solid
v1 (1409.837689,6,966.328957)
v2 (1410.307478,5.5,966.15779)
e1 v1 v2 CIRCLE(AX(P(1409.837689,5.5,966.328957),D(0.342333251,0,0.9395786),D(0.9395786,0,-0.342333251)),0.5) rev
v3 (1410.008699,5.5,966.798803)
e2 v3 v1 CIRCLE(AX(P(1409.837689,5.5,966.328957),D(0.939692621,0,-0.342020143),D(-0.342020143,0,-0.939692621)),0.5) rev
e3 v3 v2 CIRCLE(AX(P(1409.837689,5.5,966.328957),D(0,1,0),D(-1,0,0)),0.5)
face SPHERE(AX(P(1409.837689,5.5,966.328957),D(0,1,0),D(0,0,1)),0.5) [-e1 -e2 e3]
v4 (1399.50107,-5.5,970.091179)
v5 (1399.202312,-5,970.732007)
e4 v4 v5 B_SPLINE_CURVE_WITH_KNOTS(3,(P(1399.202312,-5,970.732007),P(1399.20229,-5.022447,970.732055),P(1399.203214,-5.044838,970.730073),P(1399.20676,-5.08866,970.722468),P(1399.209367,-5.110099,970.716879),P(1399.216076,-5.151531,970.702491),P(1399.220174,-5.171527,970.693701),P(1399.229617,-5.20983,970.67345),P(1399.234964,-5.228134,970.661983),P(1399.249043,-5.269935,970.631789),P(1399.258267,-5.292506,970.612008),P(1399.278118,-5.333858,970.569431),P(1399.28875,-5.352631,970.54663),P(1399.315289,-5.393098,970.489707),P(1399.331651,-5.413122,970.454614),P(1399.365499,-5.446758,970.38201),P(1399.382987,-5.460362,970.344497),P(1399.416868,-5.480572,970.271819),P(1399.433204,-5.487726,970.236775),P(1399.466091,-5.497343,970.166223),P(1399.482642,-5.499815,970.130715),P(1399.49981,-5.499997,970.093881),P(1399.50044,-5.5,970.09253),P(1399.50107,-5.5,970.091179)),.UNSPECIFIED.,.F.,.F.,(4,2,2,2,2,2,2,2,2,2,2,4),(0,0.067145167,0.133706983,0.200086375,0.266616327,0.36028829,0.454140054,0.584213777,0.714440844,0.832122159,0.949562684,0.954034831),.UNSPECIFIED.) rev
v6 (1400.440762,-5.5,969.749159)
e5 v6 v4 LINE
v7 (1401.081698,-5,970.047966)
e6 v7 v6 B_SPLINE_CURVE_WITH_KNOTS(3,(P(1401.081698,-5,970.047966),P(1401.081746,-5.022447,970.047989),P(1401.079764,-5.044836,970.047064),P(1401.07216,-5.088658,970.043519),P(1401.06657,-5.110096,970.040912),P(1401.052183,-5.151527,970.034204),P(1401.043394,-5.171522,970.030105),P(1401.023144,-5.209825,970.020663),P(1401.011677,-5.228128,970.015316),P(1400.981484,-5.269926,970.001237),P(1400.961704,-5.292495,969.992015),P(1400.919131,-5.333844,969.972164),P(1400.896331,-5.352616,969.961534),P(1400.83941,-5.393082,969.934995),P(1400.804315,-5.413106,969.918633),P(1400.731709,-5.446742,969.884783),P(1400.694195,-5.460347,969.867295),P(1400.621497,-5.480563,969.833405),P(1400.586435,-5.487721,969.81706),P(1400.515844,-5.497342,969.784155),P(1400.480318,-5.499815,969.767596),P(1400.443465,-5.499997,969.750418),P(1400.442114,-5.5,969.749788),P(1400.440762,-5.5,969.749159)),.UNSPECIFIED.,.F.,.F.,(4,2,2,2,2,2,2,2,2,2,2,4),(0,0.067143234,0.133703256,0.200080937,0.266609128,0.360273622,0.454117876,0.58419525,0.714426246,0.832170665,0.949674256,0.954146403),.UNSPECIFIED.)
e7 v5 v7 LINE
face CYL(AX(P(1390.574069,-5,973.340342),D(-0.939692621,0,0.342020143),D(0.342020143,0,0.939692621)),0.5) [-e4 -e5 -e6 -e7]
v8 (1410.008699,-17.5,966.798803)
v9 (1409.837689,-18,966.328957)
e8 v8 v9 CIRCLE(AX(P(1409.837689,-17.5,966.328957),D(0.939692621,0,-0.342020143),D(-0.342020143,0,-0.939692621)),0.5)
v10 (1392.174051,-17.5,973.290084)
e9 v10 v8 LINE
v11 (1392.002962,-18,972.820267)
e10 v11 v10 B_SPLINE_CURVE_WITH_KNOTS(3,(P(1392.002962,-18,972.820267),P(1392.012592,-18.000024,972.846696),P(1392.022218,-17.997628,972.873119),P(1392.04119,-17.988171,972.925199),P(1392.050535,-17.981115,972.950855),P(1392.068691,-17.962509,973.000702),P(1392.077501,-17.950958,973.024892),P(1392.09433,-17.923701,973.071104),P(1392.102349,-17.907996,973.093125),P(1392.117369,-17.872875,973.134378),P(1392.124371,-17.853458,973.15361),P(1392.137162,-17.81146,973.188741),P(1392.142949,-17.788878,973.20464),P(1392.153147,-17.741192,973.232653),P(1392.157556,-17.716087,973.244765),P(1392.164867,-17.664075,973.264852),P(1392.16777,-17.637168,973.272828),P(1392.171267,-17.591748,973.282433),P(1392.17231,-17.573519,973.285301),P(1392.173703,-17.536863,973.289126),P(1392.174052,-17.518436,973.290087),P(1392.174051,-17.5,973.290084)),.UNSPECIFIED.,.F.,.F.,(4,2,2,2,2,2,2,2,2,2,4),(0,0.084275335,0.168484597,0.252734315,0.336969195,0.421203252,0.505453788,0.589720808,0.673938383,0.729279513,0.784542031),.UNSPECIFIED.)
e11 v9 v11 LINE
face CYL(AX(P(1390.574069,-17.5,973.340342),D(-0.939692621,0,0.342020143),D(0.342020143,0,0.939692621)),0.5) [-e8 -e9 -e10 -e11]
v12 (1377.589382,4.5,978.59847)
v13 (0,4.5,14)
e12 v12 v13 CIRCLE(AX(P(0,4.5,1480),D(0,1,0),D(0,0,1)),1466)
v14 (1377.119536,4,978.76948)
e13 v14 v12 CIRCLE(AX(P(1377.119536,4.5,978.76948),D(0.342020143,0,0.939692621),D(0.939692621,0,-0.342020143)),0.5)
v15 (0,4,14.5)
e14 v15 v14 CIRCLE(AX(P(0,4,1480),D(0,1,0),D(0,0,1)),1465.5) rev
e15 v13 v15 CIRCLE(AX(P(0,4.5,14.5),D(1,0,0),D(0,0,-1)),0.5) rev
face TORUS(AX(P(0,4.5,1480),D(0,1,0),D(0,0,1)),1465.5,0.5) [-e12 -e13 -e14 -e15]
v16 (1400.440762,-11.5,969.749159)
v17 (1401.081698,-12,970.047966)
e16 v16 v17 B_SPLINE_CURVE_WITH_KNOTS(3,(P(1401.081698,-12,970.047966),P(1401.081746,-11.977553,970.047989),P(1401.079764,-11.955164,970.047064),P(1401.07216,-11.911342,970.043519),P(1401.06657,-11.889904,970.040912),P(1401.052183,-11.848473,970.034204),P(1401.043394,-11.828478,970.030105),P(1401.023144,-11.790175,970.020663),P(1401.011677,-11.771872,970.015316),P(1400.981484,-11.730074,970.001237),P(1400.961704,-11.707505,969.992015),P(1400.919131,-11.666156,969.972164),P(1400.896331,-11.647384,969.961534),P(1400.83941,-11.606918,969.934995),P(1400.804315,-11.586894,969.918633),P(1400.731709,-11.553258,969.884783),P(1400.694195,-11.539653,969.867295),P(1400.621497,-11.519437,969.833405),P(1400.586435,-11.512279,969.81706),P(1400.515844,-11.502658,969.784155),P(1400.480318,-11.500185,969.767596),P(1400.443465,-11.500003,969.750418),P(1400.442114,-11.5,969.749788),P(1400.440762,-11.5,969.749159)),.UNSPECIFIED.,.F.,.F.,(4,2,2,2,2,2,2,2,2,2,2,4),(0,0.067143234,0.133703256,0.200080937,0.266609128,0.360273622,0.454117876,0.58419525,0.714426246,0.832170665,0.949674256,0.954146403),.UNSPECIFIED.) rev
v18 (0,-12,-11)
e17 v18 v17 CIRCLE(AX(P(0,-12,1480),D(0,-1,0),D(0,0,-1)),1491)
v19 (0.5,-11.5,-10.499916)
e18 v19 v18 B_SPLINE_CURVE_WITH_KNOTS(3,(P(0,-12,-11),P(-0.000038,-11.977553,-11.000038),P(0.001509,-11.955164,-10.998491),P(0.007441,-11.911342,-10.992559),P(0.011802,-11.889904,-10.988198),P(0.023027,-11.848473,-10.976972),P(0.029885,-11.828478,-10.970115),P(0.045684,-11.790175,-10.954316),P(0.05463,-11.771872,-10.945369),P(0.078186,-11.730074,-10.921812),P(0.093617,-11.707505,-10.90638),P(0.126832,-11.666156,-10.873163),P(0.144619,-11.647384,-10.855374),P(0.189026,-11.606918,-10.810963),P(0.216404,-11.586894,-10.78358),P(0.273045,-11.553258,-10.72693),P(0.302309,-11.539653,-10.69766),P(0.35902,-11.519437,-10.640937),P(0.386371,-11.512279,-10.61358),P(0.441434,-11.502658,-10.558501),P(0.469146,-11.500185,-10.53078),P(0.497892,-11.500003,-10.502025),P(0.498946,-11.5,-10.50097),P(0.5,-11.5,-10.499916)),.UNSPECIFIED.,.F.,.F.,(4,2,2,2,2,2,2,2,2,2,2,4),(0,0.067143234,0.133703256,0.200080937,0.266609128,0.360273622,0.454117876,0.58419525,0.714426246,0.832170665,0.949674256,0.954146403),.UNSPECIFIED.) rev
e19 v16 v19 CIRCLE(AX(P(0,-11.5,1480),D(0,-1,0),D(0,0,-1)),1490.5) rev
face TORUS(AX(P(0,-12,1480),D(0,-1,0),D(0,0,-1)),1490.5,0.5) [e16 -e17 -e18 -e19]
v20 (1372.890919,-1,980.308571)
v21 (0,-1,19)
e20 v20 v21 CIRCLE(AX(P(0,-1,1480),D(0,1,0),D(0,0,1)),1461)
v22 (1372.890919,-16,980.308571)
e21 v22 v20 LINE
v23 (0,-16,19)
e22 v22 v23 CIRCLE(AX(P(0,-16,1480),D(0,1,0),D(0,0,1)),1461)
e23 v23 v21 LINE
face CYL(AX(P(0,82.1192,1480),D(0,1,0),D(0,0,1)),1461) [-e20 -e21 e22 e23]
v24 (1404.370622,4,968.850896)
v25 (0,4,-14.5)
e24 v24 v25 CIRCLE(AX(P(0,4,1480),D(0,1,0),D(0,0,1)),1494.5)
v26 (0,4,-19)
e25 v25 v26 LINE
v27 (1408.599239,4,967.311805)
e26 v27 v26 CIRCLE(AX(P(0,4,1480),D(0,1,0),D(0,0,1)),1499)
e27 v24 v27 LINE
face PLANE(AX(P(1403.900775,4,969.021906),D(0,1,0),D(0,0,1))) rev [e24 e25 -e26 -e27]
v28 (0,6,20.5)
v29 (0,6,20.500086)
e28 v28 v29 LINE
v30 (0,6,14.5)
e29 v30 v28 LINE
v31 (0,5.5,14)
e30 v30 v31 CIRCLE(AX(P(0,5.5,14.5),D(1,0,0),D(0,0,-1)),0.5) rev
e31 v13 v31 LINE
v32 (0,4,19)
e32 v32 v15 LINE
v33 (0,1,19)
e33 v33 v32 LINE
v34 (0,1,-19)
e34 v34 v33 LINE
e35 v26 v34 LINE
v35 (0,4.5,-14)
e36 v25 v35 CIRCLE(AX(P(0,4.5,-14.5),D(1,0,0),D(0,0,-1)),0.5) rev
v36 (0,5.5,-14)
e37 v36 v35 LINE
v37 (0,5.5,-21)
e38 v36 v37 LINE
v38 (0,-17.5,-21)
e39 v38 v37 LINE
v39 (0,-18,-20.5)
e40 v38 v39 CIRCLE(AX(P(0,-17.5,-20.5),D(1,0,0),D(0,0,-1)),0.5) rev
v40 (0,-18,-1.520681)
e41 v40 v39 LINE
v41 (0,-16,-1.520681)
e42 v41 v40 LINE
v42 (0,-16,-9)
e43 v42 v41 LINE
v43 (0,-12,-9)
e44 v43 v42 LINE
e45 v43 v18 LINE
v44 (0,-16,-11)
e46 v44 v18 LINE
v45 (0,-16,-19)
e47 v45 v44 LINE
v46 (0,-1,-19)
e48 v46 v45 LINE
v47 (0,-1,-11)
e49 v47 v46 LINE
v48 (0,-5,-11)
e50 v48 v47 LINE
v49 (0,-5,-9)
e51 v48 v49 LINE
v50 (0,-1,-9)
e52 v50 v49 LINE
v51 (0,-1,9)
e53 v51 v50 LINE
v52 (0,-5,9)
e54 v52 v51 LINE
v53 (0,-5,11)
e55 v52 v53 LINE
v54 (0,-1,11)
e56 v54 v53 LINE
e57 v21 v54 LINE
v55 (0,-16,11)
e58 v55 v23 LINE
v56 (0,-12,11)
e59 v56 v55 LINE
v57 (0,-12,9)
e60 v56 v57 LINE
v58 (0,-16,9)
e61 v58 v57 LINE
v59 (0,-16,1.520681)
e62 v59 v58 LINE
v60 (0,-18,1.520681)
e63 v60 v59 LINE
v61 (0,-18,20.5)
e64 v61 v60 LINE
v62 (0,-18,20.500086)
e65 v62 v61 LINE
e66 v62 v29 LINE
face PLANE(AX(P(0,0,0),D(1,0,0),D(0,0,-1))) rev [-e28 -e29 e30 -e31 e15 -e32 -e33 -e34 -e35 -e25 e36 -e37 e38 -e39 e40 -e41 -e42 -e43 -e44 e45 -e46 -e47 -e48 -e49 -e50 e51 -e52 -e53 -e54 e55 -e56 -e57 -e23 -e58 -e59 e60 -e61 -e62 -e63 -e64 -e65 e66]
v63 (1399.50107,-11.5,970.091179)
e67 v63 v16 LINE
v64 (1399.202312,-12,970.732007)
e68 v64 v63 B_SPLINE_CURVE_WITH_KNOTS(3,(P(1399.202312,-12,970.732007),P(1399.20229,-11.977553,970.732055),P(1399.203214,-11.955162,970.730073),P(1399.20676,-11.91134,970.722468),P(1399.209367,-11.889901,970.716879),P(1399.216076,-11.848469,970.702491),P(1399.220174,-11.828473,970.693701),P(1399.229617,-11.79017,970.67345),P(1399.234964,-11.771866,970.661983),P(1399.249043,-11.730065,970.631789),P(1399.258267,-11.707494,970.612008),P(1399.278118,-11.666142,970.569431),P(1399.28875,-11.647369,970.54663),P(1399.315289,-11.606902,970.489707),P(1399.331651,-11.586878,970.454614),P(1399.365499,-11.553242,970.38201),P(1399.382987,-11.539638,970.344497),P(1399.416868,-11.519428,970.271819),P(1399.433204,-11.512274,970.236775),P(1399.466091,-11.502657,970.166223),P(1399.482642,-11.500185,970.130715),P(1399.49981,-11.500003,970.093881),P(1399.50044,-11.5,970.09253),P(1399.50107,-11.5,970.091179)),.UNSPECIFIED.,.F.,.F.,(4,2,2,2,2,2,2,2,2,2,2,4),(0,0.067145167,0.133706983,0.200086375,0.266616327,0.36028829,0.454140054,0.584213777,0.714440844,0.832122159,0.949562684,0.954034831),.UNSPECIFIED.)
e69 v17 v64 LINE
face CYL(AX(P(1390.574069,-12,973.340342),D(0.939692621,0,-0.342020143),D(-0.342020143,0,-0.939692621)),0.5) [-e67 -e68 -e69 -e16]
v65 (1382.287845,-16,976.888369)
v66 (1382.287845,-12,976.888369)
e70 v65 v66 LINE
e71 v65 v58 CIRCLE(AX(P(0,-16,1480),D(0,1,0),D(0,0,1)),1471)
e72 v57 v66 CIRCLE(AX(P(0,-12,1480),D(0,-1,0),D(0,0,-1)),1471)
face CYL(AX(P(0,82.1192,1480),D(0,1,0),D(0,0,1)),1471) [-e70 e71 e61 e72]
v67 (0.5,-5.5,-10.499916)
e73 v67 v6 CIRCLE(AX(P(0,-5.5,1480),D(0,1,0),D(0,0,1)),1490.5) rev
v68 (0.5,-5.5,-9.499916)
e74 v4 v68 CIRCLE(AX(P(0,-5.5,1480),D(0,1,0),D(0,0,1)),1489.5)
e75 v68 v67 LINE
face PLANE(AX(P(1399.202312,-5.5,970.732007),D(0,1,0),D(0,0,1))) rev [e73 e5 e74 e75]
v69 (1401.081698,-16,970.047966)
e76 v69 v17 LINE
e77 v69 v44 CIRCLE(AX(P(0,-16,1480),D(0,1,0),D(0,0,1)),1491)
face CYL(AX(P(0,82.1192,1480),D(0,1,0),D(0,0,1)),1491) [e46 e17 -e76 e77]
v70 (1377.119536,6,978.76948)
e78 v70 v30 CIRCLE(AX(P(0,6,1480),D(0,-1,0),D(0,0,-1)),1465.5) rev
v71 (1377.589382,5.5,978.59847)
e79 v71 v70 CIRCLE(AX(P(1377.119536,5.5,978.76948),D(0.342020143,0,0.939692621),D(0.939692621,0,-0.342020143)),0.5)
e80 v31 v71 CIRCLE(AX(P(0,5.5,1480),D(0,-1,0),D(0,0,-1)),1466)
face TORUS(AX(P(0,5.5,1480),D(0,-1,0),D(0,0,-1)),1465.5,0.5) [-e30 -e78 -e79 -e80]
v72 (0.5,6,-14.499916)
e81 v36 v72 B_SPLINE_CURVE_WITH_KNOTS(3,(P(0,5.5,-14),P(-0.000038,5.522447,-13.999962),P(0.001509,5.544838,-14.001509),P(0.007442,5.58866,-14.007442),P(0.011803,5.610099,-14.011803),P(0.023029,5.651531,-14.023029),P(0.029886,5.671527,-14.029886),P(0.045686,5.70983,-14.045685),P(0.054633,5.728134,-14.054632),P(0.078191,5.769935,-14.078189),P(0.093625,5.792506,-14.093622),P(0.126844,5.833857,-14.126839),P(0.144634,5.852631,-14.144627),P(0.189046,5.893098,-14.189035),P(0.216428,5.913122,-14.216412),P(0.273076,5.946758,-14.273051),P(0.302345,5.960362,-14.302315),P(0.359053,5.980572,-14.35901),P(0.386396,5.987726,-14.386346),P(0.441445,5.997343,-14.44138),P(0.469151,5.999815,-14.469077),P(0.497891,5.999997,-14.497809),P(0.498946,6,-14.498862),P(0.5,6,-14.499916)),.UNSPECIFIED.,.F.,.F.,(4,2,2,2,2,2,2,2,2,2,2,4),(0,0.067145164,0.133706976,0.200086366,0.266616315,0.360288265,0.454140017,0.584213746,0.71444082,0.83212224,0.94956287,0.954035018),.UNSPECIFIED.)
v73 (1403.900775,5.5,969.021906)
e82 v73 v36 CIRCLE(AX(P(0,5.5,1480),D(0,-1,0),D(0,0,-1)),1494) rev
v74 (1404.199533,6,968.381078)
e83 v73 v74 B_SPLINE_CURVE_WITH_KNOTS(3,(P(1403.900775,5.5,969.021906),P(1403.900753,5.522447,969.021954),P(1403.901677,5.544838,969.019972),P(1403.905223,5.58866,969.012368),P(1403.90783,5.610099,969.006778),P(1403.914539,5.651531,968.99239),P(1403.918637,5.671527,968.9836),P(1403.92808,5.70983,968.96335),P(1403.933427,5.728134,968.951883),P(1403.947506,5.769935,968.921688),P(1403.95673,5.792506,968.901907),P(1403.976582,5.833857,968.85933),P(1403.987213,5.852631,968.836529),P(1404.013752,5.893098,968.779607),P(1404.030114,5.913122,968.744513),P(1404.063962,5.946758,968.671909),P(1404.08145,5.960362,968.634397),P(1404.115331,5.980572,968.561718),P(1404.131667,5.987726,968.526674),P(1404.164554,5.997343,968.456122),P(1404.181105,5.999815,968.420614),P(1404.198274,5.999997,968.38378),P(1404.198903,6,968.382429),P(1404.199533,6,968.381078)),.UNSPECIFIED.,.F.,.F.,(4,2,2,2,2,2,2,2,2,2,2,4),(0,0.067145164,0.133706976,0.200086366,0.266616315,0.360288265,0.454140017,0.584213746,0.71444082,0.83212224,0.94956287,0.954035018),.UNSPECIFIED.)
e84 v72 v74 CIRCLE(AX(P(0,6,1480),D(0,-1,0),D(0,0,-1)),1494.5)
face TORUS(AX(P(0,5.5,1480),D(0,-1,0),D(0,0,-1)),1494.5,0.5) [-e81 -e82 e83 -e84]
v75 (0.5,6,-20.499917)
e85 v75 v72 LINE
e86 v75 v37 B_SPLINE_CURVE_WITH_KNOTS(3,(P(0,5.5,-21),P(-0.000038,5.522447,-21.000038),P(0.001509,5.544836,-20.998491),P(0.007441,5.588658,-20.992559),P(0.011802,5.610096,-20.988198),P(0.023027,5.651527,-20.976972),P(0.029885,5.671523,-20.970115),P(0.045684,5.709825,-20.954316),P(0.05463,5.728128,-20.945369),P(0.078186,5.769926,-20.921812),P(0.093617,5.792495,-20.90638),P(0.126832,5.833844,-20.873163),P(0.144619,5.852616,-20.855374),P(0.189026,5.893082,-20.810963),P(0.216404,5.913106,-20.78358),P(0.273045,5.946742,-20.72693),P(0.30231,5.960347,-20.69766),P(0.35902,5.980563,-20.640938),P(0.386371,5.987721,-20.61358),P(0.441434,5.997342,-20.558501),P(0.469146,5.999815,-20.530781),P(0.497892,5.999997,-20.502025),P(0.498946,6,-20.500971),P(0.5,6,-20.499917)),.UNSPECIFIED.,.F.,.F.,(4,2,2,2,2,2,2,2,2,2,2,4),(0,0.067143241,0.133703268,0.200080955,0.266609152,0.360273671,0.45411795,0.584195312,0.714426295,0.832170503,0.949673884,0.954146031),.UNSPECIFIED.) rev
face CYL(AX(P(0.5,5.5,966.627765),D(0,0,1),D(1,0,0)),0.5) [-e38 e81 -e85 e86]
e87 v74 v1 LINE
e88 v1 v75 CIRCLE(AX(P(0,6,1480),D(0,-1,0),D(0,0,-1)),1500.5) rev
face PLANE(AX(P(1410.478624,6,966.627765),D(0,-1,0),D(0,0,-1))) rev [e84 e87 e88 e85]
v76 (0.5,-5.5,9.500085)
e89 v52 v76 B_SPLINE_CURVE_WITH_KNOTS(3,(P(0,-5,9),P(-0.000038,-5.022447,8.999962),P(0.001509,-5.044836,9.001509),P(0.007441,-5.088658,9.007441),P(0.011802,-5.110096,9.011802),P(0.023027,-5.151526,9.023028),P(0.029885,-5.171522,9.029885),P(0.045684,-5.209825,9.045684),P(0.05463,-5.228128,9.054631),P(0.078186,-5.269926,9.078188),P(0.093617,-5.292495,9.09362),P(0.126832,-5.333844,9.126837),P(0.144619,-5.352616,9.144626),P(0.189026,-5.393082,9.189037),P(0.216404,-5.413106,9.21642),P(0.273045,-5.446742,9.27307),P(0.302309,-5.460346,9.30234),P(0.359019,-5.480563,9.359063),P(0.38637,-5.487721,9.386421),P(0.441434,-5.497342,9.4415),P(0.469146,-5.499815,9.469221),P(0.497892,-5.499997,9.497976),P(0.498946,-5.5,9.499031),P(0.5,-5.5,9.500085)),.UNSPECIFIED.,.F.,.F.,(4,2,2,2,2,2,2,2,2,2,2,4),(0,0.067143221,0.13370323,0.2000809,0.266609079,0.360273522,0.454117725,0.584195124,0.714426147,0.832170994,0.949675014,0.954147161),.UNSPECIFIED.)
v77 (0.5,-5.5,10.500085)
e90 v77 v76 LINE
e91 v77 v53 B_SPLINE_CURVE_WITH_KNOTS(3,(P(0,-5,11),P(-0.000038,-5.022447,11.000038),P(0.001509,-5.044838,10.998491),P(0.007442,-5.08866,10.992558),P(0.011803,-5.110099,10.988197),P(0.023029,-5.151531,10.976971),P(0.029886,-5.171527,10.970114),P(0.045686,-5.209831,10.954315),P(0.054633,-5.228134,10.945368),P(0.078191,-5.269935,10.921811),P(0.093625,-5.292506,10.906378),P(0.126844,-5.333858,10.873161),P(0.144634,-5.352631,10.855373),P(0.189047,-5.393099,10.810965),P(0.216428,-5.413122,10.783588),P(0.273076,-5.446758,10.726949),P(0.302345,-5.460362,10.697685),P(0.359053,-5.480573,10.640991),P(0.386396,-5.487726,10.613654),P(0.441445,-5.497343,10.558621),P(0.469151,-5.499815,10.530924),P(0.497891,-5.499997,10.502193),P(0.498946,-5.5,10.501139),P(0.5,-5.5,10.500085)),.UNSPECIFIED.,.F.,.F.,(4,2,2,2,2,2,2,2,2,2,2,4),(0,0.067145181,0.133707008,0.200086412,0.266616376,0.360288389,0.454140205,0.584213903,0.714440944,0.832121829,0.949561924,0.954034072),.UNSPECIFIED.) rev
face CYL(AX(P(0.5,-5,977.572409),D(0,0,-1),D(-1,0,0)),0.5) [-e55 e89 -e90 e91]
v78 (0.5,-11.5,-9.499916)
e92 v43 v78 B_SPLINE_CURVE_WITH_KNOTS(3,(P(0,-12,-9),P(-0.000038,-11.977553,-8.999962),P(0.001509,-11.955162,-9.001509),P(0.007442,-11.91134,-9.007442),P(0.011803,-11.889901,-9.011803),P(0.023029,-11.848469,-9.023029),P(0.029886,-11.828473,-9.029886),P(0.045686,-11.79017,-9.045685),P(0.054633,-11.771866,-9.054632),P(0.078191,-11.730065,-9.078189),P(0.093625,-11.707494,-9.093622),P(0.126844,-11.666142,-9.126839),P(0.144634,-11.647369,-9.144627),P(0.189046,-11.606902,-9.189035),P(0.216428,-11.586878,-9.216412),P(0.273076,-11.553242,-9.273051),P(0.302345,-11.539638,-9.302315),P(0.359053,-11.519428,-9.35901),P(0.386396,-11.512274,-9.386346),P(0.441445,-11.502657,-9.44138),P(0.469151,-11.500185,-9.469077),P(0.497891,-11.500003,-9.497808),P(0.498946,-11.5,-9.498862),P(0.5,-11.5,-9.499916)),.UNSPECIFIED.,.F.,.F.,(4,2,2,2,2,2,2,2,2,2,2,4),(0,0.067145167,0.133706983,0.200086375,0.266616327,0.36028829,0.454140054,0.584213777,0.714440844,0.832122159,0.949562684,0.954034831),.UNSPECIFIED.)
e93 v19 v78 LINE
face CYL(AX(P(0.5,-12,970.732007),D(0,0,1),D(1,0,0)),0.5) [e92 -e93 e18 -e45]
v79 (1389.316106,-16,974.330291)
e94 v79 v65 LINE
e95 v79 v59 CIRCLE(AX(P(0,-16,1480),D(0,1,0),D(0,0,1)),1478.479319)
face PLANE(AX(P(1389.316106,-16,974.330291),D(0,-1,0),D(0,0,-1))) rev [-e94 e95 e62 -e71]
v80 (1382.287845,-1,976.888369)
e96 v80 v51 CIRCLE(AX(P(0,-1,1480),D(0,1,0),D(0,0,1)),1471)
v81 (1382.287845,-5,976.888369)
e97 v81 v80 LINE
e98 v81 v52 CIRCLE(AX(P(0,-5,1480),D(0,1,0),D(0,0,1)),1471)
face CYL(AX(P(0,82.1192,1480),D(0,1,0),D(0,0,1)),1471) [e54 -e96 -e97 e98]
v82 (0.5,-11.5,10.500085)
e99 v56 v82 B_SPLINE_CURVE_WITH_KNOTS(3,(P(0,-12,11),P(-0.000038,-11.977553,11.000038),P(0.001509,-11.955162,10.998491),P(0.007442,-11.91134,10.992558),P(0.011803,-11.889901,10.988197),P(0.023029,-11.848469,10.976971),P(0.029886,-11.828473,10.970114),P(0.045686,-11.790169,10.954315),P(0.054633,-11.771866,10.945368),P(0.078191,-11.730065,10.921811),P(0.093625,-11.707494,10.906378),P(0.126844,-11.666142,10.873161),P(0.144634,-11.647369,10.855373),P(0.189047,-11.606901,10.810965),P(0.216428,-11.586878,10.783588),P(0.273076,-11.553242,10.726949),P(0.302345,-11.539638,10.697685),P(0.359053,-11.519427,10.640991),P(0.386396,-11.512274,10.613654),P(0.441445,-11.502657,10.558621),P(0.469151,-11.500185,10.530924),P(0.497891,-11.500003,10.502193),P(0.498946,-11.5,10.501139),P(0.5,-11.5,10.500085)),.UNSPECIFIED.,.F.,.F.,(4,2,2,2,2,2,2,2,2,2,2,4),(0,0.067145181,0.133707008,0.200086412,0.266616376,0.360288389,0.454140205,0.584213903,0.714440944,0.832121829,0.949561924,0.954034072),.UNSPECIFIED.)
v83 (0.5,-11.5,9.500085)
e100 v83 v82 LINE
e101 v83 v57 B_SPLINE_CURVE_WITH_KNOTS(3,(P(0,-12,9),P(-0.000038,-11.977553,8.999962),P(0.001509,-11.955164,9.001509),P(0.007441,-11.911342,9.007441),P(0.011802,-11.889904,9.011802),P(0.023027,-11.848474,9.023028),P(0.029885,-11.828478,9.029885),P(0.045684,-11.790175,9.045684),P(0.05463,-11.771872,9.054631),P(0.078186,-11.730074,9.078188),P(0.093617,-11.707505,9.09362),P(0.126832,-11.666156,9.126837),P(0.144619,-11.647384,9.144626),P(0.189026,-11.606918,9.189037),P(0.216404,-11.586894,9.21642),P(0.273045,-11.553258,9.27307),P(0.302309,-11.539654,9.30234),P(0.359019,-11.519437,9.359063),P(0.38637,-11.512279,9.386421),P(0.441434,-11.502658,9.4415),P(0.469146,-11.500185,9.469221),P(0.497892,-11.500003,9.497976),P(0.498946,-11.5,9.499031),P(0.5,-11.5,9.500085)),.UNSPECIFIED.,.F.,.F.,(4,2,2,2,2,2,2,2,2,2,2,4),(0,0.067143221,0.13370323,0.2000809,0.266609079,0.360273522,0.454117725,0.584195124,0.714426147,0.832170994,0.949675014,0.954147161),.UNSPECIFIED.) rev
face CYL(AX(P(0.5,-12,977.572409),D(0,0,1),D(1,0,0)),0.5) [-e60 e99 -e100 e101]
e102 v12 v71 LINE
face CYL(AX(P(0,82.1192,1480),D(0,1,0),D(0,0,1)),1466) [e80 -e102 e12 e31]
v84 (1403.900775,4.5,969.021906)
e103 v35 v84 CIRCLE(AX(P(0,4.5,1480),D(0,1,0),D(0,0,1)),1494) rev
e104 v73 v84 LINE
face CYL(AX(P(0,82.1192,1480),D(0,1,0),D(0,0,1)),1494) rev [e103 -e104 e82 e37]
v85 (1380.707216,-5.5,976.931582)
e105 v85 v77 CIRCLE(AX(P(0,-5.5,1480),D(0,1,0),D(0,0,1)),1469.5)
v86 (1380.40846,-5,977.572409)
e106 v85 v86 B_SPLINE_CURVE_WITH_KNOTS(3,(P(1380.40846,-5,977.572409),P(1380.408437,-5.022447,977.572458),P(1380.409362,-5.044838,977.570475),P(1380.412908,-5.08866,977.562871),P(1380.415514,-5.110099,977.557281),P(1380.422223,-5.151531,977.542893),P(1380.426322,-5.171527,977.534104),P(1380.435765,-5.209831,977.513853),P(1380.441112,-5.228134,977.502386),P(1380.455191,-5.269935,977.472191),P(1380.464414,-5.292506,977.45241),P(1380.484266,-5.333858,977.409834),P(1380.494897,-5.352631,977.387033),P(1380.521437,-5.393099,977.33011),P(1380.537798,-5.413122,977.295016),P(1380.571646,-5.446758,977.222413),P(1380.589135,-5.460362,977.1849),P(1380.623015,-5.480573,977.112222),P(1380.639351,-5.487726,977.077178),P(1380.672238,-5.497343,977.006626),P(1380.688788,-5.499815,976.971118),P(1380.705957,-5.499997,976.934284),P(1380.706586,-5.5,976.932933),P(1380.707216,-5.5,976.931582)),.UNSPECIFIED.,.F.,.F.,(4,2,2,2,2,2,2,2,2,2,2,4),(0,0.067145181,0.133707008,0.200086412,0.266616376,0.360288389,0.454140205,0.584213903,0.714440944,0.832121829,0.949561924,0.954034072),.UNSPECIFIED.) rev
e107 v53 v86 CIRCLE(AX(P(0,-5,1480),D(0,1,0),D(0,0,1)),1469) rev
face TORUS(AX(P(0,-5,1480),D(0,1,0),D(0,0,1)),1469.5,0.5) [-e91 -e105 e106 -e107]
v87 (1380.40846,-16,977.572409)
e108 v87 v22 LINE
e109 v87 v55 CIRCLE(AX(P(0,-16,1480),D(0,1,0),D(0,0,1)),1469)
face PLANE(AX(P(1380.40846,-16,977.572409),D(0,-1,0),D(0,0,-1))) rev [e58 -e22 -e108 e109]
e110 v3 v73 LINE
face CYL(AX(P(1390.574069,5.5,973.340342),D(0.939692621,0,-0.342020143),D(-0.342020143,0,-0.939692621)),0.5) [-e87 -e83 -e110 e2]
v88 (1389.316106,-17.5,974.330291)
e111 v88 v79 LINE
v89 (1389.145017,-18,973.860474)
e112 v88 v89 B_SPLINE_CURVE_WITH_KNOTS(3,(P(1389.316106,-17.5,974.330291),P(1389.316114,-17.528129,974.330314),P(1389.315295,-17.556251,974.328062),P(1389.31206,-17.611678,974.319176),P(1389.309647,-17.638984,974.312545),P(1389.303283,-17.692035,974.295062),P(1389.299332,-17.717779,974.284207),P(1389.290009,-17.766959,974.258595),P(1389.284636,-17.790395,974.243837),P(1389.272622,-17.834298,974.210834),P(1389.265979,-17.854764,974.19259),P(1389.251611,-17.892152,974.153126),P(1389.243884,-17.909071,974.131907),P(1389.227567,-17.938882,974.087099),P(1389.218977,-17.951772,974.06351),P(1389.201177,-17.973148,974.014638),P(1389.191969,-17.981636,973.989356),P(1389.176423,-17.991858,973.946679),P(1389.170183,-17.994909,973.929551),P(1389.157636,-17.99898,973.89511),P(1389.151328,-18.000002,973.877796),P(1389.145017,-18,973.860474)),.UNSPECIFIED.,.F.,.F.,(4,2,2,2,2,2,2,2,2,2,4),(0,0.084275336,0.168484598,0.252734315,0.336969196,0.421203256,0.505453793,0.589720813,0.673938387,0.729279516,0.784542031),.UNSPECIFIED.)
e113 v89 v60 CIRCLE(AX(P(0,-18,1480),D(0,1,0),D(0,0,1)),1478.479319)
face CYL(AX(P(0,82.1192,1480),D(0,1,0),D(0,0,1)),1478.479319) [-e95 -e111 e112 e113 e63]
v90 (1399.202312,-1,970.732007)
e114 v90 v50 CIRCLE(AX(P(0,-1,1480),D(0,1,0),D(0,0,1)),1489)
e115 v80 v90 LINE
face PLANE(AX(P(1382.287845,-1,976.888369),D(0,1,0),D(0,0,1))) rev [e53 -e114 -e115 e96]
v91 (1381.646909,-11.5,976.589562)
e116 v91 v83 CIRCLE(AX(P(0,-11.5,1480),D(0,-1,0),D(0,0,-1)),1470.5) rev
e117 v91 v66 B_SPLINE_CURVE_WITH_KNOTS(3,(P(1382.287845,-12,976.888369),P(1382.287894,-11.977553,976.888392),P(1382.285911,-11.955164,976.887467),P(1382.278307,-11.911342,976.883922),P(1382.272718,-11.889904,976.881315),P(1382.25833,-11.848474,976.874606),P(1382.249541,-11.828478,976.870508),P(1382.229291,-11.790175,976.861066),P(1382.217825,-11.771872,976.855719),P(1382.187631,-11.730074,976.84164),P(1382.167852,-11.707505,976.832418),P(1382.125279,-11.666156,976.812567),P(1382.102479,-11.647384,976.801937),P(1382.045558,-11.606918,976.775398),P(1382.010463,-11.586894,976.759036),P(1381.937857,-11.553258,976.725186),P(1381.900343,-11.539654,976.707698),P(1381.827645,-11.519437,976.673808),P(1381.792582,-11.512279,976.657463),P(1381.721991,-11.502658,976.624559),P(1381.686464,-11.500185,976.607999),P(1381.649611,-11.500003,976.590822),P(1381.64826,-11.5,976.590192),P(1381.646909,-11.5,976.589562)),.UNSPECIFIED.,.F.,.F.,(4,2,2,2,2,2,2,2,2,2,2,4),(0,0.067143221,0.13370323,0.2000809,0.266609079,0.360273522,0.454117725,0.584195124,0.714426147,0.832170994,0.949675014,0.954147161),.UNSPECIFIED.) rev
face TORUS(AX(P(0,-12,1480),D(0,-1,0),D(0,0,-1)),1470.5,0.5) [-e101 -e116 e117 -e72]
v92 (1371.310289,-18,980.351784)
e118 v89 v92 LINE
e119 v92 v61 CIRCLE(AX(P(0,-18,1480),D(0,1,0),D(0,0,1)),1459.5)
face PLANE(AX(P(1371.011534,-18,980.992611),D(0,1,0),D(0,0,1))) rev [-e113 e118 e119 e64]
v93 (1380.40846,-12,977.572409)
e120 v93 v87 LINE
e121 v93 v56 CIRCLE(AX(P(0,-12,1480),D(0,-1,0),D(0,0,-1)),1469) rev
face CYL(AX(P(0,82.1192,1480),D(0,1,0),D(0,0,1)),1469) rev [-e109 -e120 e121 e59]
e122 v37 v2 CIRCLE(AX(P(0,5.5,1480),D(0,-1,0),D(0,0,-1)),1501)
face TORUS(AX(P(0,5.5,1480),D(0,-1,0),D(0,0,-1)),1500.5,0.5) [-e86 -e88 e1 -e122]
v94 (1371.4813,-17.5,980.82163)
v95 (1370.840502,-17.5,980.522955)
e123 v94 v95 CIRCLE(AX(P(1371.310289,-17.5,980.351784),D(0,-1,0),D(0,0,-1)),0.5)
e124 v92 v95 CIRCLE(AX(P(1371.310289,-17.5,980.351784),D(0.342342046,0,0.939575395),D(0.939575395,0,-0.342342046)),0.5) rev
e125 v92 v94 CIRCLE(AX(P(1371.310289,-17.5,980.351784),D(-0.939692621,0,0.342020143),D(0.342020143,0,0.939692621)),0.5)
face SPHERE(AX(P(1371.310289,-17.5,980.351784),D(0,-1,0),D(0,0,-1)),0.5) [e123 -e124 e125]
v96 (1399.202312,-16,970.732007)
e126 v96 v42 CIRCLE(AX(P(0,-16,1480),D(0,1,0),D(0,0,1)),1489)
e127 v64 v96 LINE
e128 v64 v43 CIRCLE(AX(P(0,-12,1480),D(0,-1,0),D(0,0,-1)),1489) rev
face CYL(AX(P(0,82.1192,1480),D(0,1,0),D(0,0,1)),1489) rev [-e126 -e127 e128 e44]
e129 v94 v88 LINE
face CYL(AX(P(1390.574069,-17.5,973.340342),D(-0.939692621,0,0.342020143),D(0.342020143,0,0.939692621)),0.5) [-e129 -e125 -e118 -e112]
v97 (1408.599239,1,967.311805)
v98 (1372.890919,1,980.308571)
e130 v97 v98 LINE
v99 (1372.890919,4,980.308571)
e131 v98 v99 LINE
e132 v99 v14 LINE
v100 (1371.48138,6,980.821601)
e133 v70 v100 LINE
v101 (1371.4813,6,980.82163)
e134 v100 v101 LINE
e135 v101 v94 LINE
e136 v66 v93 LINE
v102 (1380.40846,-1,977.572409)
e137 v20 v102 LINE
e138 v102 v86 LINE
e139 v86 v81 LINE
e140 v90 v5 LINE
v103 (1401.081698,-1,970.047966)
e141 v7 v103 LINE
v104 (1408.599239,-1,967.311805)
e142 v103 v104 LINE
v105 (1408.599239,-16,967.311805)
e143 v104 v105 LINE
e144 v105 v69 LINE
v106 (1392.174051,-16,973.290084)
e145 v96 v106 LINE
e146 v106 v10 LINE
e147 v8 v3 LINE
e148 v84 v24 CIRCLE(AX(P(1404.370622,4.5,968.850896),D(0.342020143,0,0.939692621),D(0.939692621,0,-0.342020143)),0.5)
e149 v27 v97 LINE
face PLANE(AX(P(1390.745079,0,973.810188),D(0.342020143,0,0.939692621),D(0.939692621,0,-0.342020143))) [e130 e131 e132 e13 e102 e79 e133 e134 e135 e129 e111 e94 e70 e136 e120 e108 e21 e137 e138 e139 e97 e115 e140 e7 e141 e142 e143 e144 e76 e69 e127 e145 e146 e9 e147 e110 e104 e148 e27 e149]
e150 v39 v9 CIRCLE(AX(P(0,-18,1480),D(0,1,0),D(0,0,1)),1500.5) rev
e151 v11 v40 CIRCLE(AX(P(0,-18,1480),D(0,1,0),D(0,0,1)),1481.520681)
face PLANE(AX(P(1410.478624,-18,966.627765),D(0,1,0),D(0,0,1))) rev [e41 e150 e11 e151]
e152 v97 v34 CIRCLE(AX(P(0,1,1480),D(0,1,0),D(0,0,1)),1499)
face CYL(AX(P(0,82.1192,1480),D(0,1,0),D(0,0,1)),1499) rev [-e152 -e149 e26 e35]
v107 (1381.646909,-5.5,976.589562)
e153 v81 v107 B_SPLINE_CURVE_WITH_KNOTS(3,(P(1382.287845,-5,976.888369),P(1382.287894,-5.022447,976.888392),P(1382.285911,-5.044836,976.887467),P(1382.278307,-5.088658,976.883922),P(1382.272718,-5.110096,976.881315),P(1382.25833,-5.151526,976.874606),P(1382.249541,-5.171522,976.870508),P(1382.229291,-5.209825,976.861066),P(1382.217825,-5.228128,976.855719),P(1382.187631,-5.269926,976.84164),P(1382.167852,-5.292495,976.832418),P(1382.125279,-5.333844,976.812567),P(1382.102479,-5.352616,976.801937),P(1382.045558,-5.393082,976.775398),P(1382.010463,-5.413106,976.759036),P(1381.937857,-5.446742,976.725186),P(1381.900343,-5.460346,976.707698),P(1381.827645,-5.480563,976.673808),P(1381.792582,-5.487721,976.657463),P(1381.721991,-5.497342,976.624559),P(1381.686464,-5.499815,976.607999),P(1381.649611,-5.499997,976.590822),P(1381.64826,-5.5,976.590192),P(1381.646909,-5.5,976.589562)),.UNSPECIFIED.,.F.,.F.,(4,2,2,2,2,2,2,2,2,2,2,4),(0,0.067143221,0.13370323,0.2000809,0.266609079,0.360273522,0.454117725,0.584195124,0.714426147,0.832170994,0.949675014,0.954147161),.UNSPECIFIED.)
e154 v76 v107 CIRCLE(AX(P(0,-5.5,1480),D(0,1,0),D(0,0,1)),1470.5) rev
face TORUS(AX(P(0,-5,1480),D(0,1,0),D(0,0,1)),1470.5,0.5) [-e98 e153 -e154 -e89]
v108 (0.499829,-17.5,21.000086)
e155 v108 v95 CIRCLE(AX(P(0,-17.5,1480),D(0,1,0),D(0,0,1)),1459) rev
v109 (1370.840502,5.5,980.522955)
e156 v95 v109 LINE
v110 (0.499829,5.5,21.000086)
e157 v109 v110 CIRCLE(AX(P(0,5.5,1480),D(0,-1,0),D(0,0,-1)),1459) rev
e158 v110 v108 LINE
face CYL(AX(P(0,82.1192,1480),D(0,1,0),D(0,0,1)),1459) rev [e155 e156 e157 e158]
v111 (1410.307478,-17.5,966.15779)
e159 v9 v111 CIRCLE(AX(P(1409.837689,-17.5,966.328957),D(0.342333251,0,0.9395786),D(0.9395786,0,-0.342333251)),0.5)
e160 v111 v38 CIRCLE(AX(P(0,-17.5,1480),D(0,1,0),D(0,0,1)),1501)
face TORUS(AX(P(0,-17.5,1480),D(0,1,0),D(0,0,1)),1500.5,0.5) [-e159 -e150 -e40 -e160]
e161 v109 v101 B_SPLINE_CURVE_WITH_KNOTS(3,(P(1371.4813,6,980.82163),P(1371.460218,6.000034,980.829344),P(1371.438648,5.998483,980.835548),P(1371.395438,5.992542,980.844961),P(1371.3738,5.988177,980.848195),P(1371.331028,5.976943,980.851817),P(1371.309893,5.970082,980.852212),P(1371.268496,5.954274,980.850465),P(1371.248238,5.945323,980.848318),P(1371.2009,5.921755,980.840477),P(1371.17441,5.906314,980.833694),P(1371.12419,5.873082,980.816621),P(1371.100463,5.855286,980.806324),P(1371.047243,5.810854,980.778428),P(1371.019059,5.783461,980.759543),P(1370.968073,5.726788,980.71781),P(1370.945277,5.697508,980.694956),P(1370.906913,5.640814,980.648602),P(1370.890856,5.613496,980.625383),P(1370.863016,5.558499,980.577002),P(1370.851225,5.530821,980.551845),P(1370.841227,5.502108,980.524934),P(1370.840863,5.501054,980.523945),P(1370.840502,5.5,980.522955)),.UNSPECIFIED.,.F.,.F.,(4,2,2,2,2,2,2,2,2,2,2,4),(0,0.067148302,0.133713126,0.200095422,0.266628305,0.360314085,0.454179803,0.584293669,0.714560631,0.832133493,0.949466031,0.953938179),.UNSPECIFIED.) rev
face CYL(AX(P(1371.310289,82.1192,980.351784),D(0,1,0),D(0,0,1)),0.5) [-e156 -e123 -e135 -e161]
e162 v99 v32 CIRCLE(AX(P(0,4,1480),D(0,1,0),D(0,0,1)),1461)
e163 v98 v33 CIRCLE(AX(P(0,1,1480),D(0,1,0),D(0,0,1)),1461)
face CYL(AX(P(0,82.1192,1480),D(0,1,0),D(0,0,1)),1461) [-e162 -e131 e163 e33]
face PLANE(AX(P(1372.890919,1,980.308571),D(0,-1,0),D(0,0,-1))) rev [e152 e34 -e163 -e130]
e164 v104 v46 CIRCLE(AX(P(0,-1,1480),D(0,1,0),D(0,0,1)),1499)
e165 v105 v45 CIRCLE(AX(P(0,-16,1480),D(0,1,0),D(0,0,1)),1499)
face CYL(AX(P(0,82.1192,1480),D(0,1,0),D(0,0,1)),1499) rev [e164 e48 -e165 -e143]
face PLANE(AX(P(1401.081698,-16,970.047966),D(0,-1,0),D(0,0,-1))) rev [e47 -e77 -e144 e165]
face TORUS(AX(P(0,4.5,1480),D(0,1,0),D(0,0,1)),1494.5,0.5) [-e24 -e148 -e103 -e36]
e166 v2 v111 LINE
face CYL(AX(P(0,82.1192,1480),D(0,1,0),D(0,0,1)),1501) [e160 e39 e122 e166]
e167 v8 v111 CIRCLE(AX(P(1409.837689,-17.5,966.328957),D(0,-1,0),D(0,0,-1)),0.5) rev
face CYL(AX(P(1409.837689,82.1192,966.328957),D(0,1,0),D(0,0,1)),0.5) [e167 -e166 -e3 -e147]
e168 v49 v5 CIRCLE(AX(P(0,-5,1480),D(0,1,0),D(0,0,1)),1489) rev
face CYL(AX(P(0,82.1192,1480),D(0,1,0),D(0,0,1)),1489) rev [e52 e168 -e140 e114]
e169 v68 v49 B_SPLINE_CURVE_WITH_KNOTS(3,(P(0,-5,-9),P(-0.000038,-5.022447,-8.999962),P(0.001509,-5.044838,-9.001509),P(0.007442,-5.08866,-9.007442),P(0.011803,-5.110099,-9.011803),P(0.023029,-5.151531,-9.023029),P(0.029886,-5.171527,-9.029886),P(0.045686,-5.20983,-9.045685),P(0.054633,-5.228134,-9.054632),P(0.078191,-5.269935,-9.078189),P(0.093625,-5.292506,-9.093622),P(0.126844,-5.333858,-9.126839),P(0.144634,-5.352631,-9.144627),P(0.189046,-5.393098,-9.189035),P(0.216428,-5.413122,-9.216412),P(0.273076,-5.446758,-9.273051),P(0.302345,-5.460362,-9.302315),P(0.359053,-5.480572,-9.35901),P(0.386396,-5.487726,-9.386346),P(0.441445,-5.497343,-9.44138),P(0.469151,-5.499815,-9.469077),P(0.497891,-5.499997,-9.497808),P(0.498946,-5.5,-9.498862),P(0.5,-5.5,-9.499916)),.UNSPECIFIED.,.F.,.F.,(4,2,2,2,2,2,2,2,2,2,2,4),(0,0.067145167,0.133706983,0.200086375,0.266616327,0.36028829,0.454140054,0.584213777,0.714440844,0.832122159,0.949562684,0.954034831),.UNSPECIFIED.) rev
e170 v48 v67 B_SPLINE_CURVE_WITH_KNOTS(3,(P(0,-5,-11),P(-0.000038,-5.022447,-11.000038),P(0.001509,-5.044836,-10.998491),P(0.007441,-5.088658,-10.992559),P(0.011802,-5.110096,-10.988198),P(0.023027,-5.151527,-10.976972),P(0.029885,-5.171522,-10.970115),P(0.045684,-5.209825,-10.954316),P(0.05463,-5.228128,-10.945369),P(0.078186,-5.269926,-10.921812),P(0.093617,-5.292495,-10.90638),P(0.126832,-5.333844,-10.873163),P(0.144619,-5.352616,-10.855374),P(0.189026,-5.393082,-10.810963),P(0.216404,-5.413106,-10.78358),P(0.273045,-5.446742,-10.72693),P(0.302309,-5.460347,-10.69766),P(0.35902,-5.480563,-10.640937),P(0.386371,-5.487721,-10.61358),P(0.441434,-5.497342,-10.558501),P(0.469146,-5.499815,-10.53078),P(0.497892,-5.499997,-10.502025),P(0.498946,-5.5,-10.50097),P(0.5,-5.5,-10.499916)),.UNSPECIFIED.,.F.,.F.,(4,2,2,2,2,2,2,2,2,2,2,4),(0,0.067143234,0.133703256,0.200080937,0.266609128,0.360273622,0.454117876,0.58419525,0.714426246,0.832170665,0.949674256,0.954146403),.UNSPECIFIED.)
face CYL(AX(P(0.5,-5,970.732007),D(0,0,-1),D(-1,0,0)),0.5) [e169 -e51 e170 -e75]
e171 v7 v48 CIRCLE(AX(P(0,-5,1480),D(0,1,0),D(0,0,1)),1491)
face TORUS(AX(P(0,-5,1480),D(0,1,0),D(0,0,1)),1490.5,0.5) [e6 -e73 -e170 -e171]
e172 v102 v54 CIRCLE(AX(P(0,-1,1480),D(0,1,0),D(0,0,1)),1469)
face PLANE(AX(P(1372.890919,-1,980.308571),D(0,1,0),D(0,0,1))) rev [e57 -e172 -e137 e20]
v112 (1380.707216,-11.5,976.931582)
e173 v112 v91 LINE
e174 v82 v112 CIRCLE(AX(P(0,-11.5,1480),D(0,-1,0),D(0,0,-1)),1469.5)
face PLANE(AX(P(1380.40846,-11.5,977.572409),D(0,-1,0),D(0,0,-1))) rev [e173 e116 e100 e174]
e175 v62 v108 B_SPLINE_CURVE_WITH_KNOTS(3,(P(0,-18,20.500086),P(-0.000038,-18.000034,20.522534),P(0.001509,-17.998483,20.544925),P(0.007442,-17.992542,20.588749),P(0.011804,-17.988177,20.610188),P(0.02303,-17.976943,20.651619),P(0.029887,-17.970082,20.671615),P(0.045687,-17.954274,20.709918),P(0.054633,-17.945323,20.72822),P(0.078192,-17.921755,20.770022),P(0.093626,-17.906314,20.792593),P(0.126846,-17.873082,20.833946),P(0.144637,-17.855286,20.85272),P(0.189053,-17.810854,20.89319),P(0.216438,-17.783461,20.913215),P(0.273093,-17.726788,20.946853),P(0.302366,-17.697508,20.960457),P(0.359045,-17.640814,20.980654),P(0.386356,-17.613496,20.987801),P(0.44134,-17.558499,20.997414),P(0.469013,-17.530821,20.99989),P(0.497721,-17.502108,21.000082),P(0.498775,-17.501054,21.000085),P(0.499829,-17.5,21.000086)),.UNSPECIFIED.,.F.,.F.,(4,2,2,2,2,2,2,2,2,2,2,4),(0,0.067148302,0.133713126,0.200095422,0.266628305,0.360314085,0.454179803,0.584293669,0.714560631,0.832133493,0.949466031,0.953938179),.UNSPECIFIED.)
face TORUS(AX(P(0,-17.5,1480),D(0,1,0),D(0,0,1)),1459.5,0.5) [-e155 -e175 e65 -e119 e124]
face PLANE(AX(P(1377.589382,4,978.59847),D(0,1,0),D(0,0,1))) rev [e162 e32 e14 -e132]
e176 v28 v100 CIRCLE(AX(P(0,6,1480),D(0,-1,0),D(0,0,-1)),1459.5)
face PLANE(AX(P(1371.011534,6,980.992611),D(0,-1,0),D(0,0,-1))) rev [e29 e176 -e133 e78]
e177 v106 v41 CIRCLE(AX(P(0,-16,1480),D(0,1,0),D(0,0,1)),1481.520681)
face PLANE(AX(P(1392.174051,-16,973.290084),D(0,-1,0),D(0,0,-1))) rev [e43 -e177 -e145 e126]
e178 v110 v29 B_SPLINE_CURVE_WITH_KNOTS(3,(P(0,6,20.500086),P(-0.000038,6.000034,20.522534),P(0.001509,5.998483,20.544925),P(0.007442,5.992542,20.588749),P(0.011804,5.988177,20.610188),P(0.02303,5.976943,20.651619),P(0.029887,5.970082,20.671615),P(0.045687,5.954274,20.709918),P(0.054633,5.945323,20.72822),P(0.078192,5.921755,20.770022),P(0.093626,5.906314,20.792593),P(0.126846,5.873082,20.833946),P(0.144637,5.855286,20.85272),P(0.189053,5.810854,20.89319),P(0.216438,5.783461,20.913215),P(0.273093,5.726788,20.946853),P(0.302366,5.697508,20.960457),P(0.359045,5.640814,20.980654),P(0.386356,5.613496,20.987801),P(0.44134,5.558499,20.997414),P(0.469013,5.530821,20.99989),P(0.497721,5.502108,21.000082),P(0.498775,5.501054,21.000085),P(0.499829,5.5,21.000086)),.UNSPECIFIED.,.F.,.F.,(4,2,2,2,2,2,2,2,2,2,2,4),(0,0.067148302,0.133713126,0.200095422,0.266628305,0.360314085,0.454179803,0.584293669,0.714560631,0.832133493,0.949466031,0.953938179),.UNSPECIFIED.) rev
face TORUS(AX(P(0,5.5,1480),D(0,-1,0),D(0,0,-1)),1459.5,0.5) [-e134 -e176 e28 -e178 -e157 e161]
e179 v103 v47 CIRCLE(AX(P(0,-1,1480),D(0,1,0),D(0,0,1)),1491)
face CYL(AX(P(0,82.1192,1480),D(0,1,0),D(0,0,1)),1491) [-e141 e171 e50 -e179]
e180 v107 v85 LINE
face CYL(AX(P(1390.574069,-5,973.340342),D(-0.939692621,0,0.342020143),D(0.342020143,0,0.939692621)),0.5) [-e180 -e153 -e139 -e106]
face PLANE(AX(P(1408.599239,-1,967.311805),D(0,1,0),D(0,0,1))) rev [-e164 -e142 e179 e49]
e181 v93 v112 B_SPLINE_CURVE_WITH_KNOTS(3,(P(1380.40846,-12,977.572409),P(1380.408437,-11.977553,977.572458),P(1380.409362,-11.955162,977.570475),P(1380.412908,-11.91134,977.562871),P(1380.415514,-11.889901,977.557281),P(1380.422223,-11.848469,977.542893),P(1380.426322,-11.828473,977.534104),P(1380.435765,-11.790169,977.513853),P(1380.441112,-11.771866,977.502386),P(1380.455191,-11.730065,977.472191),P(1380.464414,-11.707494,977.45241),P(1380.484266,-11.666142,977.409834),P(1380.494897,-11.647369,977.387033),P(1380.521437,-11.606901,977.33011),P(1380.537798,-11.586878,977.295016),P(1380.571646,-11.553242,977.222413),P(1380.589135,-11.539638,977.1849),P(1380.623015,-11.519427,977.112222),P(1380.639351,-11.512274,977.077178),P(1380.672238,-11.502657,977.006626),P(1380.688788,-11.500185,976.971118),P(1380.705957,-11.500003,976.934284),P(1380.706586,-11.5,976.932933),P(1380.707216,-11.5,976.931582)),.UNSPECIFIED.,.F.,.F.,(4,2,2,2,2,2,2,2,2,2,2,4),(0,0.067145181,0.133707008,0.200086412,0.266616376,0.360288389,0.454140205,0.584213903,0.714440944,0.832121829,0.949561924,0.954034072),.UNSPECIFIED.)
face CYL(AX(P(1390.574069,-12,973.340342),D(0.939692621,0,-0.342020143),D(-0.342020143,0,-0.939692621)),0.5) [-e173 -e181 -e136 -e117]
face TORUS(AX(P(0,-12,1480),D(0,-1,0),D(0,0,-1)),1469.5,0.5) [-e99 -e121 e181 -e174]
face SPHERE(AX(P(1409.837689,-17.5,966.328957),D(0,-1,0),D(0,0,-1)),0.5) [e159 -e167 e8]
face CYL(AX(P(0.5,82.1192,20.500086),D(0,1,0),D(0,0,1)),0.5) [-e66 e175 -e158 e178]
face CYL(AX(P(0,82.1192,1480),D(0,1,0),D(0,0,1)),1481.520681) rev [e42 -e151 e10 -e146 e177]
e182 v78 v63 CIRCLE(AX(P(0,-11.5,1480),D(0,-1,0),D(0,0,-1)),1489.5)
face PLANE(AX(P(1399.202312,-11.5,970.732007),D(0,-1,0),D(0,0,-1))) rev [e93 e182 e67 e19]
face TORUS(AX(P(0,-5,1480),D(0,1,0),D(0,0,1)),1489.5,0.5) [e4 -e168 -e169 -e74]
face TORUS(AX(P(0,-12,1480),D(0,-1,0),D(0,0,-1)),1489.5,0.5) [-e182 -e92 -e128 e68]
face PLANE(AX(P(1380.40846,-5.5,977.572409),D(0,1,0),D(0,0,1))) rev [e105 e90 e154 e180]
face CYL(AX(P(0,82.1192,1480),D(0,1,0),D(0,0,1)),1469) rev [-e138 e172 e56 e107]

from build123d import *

# Parameters (mm, degrees)
REVOLVE_1_ANGLE = 70
FILLET_1_R      = 0.5
FILLET_2_R      = 0.5


with BuildPart() as part:
    # 草图1 → 旋转1 (revolve)
    with BuildSketch(Plane(origin=(0, 0, 0), x_dir=(0, 0, -1), z_dir=(1, 0, 0))):
        Polygon((-21, 6), (-14, 6), (-14, 4), (-19, 4), (-19, 1), (-0.046652987, 1), (0.046652987, 1), (19, 1), (19, 4), (14, 4), (14, 6), (21, 6), (21, -18), (1.520680953, -18), (1.520680953, -16), (9, -16), (9, -11.5), (11, -11.5), (11, -16), (19, -16), (19, -1), (11, -1), (11, -5.5), (9, -5.5), (9, -1), (-9, -1), (-9, -5.5), (-11, -5.5), (-11, -1), (-19, -1), (-19, -16), (-11, -16), (-11, -11.5), (-9, -11.5), (-9, -16), (-1.520680953, -16), (-1.520680953, -18), (-21, -18), align=None)
    revolve(axis=Axis((0, 82.1191999, 1480), (0, -1, 0)), revolution_arc=REVOLVE_1_ANGLE)

    # 圆角1
    fillet_1_edges = [part.edges().sort_by_distance(p)[0] for p in [
        (0, 6, -17.5),
        (860.938230963, 6, 250.452781522),
        (1407.189699627, 6, 967.82483537),
        (856.923195908, 6, 256.186845832),
        (0, -6, 21),
        (836.848020636, 6, 284.857167382),
        (1371.011533727, -6, 980.992610888),
        (836.848020636, -18, 284.857167382),
        (856.923195908, 4, 256.186845832),
        (860.938230963, -18, 250.452781522),
        (1410.4786238, -6, 966.627764868),
        (1401.326337616, -18, 969.958924614),
        (1380.16381991, -18, 977.661451142),
        (840.863055691, 4, 279.123103072),
        (840.863055691, 6, 279.123103072),
    ]]
    fillet(fillet_1_edges, radius=FILLET_1_R)

    # 圆角2
    # the kernel refuses this fillet: 0.5 mm, written as the material it takes off along each edge
    with BuildSketch(Plane(origin=(1379.233844159, -11.5, 977.999934634), x_dir=(0, -1, 0), z_dir=(0.9396926207859094, 0, -0.34202014332566616)), Plane(origin=(1383.462460952, -5.5, 976.460843989), x_dir=(0, 1, 0), z_dir=(-0.9396926207859094, 0, 0.34202014332566616)), Plane(origin=(1402.256313368, -5.5, 969.620441122), x_dir=(0, 1, 0), z_dir=(-0.9396926207859094, 0, 0.34202014332566616)), Plane(origin=(1398.027696574, -11.5, 971.159531767), x_dir=(0, -1, 0), z_dir=(0.9396926207859094, 0, -0.34202014332566616))) as fillet_2_piece_1:
        with BuildLine():
            CenterArc((FILLET_2_R, FILLET_2_R), FILLET_2_R, 180, 90)
            Line((0, FILLET_2_R), (0, 0))
            Line((0, 0), (FILLET_2_R, 0))
        make_face()
    extrude(amount=4.5, mode=Mode.SUBTRACT)
    with BuildSketch(Plane(origin=(0, -11.5, 12.25), x_dir=(0, -1, 0), z_dir=(0, 0, -1)), Plane(origin=(0, -5.5, 7.75), x_dir=(0, 1, 0), z_dir=(0, 0, 1)), Plane(origin=(0, -5.5, -12.25), x_dir=(0, 1, 0), z_dir=(0, 0, 1)), Plane(origin=(0, -11.5, -7.75), x_dir=(0, -1, 0), z_dir=(0, 0, -1))) as fillet_2_piece_2:
        with BuildLine():
            CenterArc((FILLET_2_R, -FILLET_2_R), FILLET_2_R, 90, 90)
            Line((0, -FILLET_2_R), (0, 0))
            Line((0, 0), (FILLET_2_R, 0))
        make_face()
    extrude(amount=4.5, mode=Mode.SUBTRACT)
    with BuildSketch(Plane(origin=(0, -11.5, 1480), x_dir=(-0.0008396934722152373, 0, -0.9999996474573741), z_dir=(-0.9999996474573741, 0, 0.0008396934722152373))) as fillet_2_piece_3:
        with BuildLine():
            CenterArc((1489 + FILLET_2_R, FILLET_2_R), FILLET_2_R, 180, 90)
            Line((1489 + FILLET_2_R, 0), (1489, 0))
            Line((1489, 0), (1489, FILLET_2_R))
        make_face()
    revolve(axis=Axis((0, -11.5, 1480), (0, -1, 0)), revolution_arc=70.096221795, mode=Mode.SUBTRACT)
    with BuildSketch(Plane(origin=(0, -11.5, 1480), x_dir=(-0.0008385671230867866, 0, -0.9999996484025282), z_dir=(-0.9999996484025282, 0, 0.0008385671230867866))) as fillet_2_piece_4:
        with BuildLine():
            CenterArc((1491 - FILLET_2_R, FILLET_2_R), FILLET_2_R, 270, 90)
            Line((1491, FILLET_2_R), (1491, 0))
            Line((1491, 0), (1491 - FILLET_2_R, 0))
        make_face()
    revolve(axis=Axis((0, -11.5, 1480), (0, -1, 0)), revolution_arc=70.096092725, mode=Mode.SUBTRACT)
    with BuildSketch(Plane(origin=(0, -5.5, 1480), x_dir=(-0.0008385671230867866, 0, -0.9999996484025282), z_dir=(-0.9999996484025282, 0, 0.0008385671230867866))) as fillet_2_piece_5:
        with BuildLine():
            CenterArc((1491 - FILLET_2_R, -FILLET_2_R), FILLET_2_R, 0, 90)
            Line((1491, -FILLET_2_R), (1491, 0))
            Line((1491, 0), (1491 - FILLET_2_R, 0))
        make_face()
    revolve(axis=Axis((0, -5.5, 1480), (0, -1, 0)), revolution_arc=70.096092725, mode=Mode.SUBTRACT)
    with BuildSketch(Plane(origin=(0, -5.5, 1480), x_dir=(-0.0008396934722152373, 0, -0.9999996474573741), z_dir=(-0.9999996474573741, 0, 0.0008396934722152373))) as fillet_2_piece_6:
        with BuildLine():
            CenterArc((1489 + FILLET_2_R, -FILLET_2_R), FILLET_2_R, 90, 90)
            Line((1489 + FILLET_2_R, 0), (1489, 0))
            Line((1489, 0), (1489, -FILLET_2_R))
        make_face()
    revolve(axis=Axis((0, -5.5, 1480), (0, -1, 0)), revolution_arc=70.096221795, mode=Mode.SUBTRACT)
    with BuildSketch(Plane(origin=(0, -5.5, 1480), x_dir=(-0.0008499684408638254, 0, -0.9999996387767596), z_dir=(-0.9999996387767596, 0, 0.0008499684408638254))) as fillet_2_piece_7:
        with BuildLine():
            CenterArc((1471 - FILLET_2_R, -FILLET_2_R), FILLET_2_R, 0, 90)
            Line((1471, -FILLET_2_R), (1471, 0))
            Line((1471, 0), (1471 - FILLET_2_R, 0))
        make_face()
    revolve(axis=Axis((0, -5.5, 1480), (0, -1, 0)), revolution_arc=70.09739922, mode=Mode.SUBTRACT)
    with BuildSketch(Plane(origin=(0, -5.5, 1480), x_dir=(-0.0008511256474475692, 0, -0.9999996377925005), z_dir=(-0.9999996377925005, 0, 0.0008511256474475692))) as fillet_2_piece_8:
        with BuildLine():
            CenterArc((1469 + FILLET_2_R, -FILLET_2_R), FILLET_2_R, 90, 90)
            Line((1469 + FILLET_2_R, 0), (1469, 0))
            Line((1469, 0), (1469, -FILLET_2_R))
        make_face()
    revolve(axis=Axis((0, -5.5, 1480), (0, -1, 0)), revolution_arc=70.097531827, mode=Mode.SUBTRACT)
    with BuildSketch(Plane(origin=(0, -11.5, 1480), x_dir=(-0.0008511256474475692, 0, -0.9999996377925005), z_dir=(-0.9999996377925005, 0, 0.0008511256474475692))) as fillet_2_piece_9:
        with BuildLine():
            CenterArc((1469 + FILLET_2_R, FILLET_2_R), FILLET_2_R, 180, 90)
            Line((1469, FILLET_2_R), (1469, 0))
            Line((1469, 0), (1469 + FILLET_2_R, 0))
        make_face()
    revolve(axis=Axis((0, -11.5, 1480), (0, -1, 0)), revolution_arc=70.097531827, mode=Mode.SUBTRACT)
    with BuildSketch(Plane(origin=(0, -11.5, 1480), x_dir=(-0.0008499684408638254, 0, -0.9999996387767596), z_dir=(-0.9999996387767596, 0, 0.0008499684408638254))) as fillet_2_piece_10:
        with BuildLine():
            CenterArc((1471 - FILLET_2_R, FILLET_2_R), FILLET_2_R, 270, 90)
            Line((1471 - FILLET_2_R, 0), (1471, 0))
            Line((1471, 0), (1471, FILLET_2_R))
        make_face()
    revolve(axis=Axis((0, -11.5, 1480), (0, -1, 0)), revolution_arc=70.09739922, mode=Mode.SUBTRACT)


solid = part.part
